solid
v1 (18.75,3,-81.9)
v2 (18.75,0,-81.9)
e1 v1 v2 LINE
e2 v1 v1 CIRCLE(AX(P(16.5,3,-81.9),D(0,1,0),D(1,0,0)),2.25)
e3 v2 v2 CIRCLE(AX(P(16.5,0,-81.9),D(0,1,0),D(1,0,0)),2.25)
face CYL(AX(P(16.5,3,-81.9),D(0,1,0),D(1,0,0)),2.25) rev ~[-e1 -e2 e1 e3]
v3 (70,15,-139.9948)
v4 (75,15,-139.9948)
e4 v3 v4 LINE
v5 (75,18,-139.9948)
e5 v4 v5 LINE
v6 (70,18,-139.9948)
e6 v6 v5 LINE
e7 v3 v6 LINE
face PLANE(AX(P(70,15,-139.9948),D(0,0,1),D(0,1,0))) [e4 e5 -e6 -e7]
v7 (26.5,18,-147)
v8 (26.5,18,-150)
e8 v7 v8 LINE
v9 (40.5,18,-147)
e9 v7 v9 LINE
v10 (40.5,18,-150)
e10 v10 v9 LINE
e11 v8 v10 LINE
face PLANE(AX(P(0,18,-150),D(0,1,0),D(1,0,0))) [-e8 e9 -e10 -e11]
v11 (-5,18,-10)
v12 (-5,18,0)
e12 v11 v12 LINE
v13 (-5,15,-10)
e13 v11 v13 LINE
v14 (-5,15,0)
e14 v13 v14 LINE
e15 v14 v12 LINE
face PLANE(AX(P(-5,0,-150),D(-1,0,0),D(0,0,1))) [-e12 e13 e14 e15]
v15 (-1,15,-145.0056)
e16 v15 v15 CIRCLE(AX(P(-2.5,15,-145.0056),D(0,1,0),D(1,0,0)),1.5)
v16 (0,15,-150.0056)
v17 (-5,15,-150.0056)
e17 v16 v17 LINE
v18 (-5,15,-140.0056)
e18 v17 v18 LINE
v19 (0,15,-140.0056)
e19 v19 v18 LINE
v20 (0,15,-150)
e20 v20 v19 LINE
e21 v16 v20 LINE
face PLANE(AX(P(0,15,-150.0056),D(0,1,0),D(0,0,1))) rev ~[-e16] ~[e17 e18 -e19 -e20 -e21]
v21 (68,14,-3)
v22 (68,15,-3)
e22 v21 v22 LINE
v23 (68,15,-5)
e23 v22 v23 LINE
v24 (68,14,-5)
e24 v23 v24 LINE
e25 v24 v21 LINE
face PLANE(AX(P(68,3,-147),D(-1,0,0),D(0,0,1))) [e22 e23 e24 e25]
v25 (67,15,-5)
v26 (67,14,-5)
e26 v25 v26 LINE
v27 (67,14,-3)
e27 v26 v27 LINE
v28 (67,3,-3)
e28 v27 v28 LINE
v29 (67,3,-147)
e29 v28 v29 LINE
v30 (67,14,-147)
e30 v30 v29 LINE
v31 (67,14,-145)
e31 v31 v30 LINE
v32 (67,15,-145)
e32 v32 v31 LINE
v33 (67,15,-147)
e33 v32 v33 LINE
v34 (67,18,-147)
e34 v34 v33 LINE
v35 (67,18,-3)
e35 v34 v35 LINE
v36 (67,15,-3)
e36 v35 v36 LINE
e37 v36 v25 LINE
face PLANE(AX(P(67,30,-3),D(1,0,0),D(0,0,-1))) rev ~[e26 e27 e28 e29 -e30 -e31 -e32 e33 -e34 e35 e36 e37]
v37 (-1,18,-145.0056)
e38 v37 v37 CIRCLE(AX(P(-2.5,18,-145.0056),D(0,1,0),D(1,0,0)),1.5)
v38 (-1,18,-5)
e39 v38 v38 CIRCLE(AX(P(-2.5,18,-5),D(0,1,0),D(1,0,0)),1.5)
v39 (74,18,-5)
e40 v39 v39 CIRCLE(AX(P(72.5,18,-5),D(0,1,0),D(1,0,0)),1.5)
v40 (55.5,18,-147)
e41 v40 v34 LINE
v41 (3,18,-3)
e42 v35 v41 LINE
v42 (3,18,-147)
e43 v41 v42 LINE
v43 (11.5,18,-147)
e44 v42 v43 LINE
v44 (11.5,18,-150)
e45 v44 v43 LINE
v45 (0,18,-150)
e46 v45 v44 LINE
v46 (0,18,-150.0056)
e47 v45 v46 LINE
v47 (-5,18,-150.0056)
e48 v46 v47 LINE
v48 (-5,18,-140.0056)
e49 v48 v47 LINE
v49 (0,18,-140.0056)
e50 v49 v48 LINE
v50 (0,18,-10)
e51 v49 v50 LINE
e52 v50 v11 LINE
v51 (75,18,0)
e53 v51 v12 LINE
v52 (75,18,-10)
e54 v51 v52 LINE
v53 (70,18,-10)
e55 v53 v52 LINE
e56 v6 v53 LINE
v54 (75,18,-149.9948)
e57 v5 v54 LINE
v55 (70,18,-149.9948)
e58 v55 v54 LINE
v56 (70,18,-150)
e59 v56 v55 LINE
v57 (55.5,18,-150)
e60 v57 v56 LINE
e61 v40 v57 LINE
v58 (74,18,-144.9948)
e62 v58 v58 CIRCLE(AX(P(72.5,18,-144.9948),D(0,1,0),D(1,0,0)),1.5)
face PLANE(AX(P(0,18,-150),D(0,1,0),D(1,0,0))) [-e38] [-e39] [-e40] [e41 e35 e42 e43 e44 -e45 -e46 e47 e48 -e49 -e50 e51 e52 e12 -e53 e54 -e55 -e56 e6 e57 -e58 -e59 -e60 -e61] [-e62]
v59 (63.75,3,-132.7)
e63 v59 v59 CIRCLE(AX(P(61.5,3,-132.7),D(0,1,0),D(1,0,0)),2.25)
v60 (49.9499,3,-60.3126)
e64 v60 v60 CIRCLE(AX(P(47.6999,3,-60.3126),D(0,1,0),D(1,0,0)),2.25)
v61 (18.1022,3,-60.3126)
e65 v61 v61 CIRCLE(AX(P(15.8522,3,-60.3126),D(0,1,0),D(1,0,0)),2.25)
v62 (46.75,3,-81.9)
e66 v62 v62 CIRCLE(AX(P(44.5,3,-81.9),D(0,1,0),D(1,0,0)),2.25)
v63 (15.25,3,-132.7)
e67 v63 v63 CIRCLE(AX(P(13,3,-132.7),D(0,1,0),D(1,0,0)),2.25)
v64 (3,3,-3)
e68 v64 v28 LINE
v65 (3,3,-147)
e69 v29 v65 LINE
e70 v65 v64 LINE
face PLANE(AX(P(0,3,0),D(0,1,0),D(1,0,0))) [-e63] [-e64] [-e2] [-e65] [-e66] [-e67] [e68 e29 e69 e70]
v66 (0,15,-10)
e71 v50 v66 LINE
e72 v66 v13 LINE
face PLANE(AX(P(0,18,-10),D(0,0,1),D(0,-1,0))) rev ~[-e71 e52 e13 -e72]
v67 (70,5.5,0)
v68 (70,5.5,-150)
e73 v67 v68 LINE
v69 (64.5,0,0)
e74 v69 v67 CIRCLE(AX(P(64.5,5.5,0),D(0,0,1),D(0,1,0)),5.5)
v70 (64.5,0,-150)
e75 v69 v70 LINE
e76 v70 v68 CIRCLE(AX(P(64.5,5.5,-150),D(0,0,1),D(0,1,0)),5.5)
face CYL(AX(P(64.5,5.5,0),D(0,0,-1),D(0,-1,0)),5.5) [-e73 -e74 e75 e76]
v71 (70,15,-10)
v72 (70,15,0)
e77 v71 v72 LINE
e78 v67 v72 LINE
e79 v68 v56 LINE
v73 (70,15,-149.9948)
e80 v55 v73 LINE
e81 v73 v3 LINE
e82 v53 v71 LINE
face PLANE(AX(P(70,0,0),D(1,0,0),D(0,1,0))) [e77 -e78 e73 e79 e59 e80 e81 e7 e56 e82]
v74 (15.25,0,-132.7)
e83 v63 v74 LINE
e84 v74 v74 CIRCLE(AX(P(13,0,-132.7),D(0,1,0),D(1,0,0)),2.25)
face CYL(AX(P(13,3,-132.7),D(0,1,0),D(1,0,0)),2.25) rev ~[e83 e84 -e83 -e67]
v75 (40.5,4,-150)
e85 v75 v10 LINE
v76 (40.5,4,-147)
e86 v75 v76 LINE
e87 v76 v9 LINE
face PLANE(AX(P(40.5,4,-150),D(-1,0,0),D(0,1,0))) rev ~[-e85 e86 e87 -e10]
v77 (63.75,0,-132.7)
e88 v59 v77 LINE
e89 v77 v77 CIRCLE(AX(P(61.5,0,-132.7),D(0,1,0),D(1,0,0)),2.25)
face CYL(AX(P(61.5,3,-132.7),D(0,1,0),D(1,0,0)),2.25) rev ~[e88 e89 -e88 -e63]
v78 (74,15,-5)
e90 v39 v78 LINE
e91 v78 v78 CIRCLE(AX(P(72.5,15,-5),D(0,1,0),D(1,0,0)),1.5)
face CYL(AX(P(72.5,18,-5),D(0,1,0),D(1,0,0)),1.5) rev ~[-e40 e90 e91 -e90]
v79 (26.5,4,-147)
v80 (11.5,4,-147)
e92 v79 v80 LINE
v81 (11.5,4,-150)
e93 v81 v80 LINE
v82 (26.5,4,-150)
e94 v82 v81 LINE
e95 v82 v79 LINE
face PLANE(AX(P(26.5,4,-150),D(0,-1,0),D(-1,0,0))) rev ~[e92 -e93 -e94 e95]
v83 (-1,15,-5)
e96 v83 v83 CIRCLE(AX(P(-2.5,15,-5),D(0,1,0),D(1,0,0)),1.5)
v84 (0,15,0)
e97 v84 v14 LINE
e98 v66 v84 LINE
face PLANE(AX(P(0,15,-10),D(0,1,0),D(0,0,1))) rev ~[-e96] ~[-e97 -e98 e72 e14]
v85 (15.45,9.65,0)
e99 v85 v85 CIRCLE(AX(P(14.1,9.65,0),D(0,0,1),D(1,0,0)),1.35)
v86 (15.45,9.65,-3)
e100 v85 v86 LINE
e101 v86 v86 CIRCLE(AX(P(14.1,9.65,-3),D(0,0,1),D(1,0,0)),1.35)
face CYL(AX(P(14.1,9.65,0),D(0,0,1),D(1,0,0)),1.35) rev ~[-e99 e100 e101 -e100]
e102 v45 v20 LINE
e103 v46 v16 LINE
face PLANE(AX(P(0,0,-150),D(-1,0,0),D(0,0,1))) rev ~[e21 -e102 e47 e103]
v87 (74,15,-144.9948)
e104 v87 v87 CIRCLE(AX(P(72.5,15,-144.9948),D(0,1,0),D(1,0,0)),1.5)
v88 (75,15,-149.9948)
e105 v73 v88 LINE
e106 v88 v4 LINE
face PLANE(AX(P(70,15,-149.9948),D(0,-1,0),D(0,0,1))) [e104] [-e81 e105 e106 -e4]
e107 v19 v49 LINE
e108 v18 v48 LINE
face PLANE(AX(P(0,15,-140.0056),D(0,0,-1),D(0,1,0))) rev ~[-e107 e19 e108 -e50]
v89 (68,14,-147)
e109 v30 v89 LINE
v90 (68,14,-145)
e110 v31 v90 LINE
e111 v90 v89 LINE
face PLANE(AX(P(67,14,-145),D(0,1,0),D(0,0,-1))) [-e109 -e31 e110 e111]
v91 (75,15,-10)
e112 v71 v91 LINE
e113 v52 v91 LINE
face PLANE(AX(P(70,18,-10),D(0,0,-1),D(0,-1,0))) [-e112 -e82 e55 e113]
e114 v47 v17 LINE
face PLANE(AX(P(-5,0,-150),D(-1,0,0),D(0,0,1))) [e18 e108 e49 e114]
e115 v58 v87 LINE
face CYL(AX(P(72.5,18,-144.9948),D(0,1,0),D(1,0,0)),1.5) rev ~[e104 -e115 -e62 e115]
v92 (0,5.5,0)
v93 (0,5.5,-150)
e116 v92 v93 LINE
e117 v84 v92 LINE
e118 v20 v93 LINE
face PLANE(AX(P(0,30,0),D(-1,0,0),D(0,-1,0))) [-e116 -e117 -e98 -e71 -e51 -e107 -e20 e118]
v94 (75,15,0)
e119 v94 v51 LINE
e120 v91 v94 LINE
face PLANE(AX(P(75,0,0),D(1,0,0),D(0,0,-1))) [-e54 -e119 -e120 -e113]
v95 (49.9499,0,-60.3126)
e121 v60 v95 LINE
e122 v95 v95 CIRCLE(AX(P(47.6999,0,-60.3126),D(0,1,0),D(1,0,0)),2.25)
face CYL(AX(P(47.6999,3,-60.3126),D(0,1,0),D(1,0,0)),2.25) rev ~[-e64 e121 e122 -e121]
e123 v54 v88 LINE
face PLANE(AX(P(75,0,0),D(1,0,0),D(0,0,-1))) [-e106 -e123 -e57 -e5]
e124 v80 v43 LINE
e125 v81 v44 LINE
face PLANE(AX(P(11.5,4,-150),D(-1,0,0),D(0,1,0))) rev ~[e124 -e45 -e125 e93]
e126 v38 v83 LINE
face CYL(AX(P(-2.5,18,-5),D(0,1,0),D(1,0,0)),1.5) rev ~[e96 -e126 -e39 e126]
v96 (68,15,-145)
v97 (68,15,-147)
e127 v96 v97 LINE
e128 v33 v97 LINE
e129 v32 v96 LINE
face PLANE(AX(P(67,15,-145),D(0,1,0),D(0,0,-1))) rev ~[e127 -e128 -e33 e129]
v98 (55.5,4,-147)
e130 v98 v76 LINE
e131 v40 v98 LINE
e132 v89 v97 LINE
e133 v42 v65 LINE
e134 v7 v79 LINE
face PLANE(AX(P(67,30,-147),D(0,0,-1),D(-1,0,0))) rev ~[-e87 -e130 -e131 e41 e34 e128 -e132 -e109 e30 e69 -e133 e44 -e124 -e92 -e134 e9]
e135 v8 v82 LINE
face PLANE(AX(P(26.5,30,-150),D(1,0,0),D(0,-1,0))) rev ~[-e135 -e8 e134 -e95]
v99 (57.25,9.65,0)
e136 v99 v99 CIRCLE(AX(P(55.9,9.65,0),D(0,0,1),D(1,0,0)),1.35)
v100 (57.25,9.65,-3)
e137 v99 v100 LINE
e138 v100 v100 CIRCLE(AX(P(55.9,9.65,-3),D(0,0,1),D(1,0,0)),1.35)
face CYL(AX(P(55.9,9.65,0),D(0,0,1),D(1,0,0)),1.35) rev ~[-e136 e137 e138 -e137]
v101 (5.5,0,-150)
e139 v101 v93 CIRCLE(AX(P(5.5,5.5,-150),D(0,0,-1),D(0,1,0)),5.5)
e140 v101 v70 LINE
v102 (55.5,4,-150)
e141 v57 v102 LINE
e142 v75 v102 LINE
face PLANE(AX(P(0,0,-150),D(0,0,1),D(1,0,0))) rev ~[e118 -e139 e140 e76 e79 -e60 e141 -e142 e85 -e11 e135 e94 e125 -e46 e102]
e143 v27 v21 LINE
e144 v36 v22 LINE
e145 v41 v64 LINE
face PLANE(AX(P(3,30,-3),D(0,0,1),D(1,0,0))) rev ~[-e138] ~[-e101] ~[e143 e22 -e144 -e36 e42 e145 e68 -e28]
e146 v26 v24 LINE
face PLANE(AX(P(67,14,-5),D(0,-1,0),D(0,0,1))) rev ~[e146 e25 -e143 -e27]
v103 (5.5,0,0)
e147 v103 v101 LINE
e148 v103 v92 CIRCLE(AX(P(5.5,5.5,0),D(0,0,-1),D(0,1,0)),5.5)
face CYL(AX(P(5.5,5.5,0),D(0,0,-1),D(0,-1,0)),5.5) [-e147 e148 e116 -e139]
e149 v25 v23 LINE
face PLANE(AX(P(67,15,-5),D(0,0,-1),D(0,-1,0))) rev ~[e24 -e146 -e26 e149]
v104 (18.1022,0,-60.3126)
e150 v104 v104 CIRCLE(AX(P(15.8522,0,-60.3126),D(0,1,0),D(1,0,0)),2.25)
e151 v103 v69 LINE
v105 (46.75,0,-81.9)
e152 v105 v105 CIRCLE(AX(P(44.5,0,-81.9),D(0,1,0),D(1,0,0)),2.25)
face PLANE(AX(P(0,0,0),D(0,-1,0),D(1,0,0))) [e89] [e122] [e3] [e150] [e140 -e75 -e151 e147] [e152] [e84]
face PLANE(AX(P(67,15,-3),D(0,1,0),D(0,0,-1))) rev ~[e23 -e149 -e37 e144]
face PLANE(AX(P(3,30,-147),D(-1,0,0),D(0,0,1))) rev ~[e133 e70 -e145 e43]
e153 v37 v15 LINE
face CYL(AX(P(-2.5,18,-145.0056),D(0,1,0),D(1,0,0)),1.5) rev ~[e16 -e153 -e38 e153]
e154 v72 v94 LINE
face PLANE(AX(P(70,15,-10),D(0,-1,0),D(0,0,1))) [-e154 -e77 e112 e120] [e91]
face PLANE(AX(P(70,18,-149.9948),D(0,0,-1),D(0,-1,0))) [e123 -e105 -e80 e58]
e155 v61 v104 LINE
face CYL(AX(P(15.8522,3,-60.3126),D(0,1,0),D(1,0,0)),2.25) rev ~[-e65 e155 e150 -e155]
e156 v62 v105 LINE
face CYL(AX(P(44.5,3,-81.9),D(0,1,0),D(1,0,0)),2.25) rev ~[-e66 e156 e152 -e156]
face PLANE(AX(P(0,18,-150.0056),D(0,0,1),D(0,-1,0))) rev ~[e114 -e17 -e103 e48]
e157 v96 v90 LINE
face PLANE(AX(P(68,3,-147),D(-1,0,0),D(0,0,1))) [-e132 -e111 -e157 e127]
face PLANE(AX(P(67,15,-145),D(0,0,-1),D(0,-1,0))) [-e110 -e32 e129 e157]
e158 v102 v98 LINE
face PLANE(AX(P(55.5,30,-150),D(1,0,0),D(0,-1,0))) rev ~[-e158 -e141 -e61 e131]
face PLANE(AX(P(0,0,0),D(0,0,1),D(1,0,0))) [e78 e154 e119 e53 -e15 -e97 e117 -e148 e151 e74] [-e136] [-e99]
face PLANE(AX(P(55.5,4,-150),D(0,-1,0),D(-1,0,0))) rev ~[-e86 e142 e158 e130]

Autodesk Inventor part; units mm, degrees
ref_plane "YZ Plane" through (0, 0, 0) normal (1, 0, 0) x (0, 1, 0)
ref_plane "XZ Plane" through (0, 0, 0) normal (0, 1, 0) x (-1, 0, 0)
ref_plane "XY Plane" through (0, 0, 0) normal (0, 0, 1) x (1, 0, 0)
sketch "Sketch7" plane through (0, 0, 0) normal (0, 0, 1) x (1, 0, 0)
  line L0 (0, 0) -> (70, 0)
  line L1 (70, 0) -> (70, 30)
  line L2 (70, 30) -> (0, 30)
  line L3 (0, 30) -> (0, 0)
  dimension "d25" = 70
  dimension "d26" = 30
extrude "Extrusion5" add sketch "Sketch7" against normal blind 150
sketch "Sketch8" plane through (0, 30, 0) normal (0, 1, 0) x (1, 0, 0)
  line L0 (0, 0) -> (3, 0)
  line L1 (3, 0) -> (3, 3)
  line L2 (3, 3) -> (0, 3)
  line L3 (0, 3) -> (0, 0)
  line L4 (70, 150) -> (67, 150)
  line L5 (67, 150) -> (67, 147)
  line L6 (67, 147) -> (70, 147)
  line L7 (70, 147) -> (70, 150)
  line L8 (3, 3) -> (67, 3)
  line L9 (67, 3) -> (67, 147)
  line L10 (67, 147) -> (3, 147)
  line L11 (3, 147) -> (3, 3)
  dimension "d29" = 3
  dimension "d30" = 3
  dimension "d31" = 3
  dimension "d32" = 3
extrude "Extrusion6" cut sketch "Sketch8" against normal blind 27 contours L11 L10 L9 L8
sketch "Sketch10" plane through (0, 0, -150) normal (0, 0, -1) x (-1, 0, 0)
  line L0 (-70, 30) -> (-70, 0) projected
  line L1 (-70, 0) -> (-61.5, 0)
  line L2 (-70, 4) -> (-70, 0)
  line L3 (0, 0) -> (0, 30) projected
  line L4 (0, 0) -> (-8.5, 0)
  line L5 (0, 4) -> (0, 0)
  line L6 (-54.5, 4) -> (-41.5, 4)
  line L7 (-61.5, 0) -> (-51.709, 0)
  line L8 (-8.5, 0) -> (-41.5, 0)
  line L9 (-26.0357, 0) -> (-23.5, 0)
  line L10 (-40.5, 4) -> (-40.5, 30)
  line L11 (-40.5, 30) -> (-55.5, 30)
  line L12 (-55.5, 30) -> (-55.5, 4)
  line L13 (-70, 0) -> (0, 0) projected
  line L14 (-55.5, 0) -> (-40.5, 0)
  line L15 (-55.5, 4) -> (-40.5, 4)
  line L16 (-11.5, 4) -> (-11.5, 30)
  line L17 (-11.5, 30) -> (-26.5, 30)
  line L18 (-26.5, 30) -> (-26.5, 4)
  line L19 (-26.5, 4) -> (-11.5, 4)
  point P0 (-48, 10)
  dimension "d188" = 15
  dimension "d189" = 15
sketch "Sketch15" plane through (0, 0, -150) normal (0, 0, -1) x (-1, 0, 0)
  line L0 (-70, 30) -> (-70, 0) projected
  line L1 (0, 30) -> (0, 0) projected
  line L2 (-70, 30) -> (0, 30)
  line L3 (0, 30) -> (0, 18)
  line L4 (0, 18) -> (-70, 18)
  line L5 (-70, 18) -> (-70, 30)
  dimension "d100" = 12
extrude "Extrusion10" cut sketch "Sketch15" against normal blind 10000
sketch "Sketch20" plane through (67, 3, -147) normal (-1, 0, 0) x (0, 0, 1)
  line L0 (0, 15) -> (144, 15)
  line L1 (144, 15) -> (144, 12)
  line L2 (144, 12) -> (0, 12)
  line L3 (0, 12) -> (0, 15)
  line L4 (0, 12) -> (2, 12)
  line L5 (2, 12) -> (2, 11)
  line L6 (2, 11) -> (0, 11)
  line L7 (0, 11) -> (0, 12)
  line L8 (144, 12) -> (142, 12)
  line L9 (142, 12) -> (142, 11)
  line L10 (142, 11) -> (144, 11)
  line L11 (144, 11) -> (144, 12)
  point P0 (147, -3)
  point P1 (2, 12)
  dimension "d132" = 144
  dimension "d133" = 3
  dimension "d134" = 2
  dimension "d135" = 1
  dimension "d136" = 2
  dimension "d137" = 1
extrude "Extrusion17" cut sketch "Sketch20" against normal blind 1 contours L2 L5 L6 L7 | L11 L10 L9 L2
sketch "Sketch21" plane through (70, 0, 0) normal (1, 0, 0) x (0, 0, -1)
  line L0 (0, 0) -> (0, 18) projected
  line L1 (0, 18) -> (10, 18)
  line L2 (10, 18) -> (10, 15)
  line L3 (10, 15) -> (0, 15)
  line L4 (0, 15) -> (0, 18)
  line L5 (139.9948, 18) -> (149.9948, 18)
  line L6 (149.9948, 18) -> (149.9948, 15)
  line L7 (149.9948, 15) -> (139.9948, 15)
  line L8 (139.9948, 15) -> (139.9948, 18)
  dimension "d144" = 10
  dimension "d145" = 3
  dimension "d146" = 10
  dimension "d147" = 3
extrude "Extrusion18" add sketch "Sketch21" along normal blind 5
sketch "Sketch23" plane through (0, 0, -150) normal (-1, 0, 0) x (0, 0, 1)
  line L0 (150, 18) -> (147, 18) projected
  line L1 (150, 18) -> (140, 18)
  line L2 (140, 18) -> (140, 15)
  line L3 (140, 15) -> (150, 15)
  line L4 (150, 15) -> (150, 18)
  line L5 (9.9944, 18) -> (-0.0056, 18)
  line L6 (-0.0056, 18) -> (-0.0056, 15)
  line L7 (-0.0056, 15) -> (9.9944, 15)
  line L8 (9.9944, 15) -> (9.9944, 18)
  point P0 (150, 0)
  point P1 (149.4, 18)
  point P2 (149.4, 18)
  dimension "d158" = 10
  dimension "d159" = 3
  dimension "d160" = 10
  dimension "d161" = 3
extrude "Extrusion20" add sketch "Sketch23" along normal blind 5
sketch "Sketch25" plane through (3, 18, -147) normal (0, 1, 0) x (1, 0, 0)
  line L0 (72, -147) -> (-8, -147) projected
  line L1 (-8, -147) -> (-5.5, -147)
  line L2 (-8, -142) -> (-8, -147)
  line L3 (53.15, -147) -> (72, -147) projected
  line L4 (72, -147) -> (69.5, -147)
  line L5 (72, -142) -> (72, -147)
  line L6 (72, 2.9948) -> (69.5, 2.9948)
  line L7 (72, -2.0052) -> (72, 2.9948)
  line L8 (-8, 3.0056) -> (-8, -6.9944) projected
  line L9 (-8, 3.0056) -> (-5.5, 3.0056)
  line L10 (-8, -1.9944) -> (-8, 3.0056)
  circle A0 centre (-5.5, -1.9944) radius 1.5
  circle A1 centre (69.5, -2.0052) radius 1.5
  circle A2 centre (69.5, -142) radius 1.5
  circle A3 centre (-5.5, -142) radius 1.5
  point P0 (-3, -147)
  point P1 (10.85, -147)
  dimension "d180" = 3
  dimension "d181" = 3
  dimension "d182" = 3
  dimension "d183" = 3
extrude "Extrusion22" cut sketch "Sketch25" against normal blind 10
extrude "Extrusion23" cut sketch "Sketch10" against normal blind 10
sketch "Sketch26" plane through (0, 3, 0) normal (0, 1, 0) x (1, 0, 0)
  line L0 (3, 147) -> (67, 147) projected
  line L1 (3, 147) -> (13, 147)
  line L2 (3, 132.7) -> (3, 147)
  line L3 (61.5, 121.8573) -> (13, 121.8573)
  line L4 (16.5, 91.8787) -> (44.5, 91.8787)
  circle A0 centre (16.5, 81.9) radius 2.25
  circle A1 centre (44.5, 81.9) radius 2.25
  circle A2 centre (61.5, 132.7) radius 2.25
  circle A3 centre (13, 132.7) radius 2.25
  point P0 (0, 0)
  dimension "d195" = 48.5
  dimension "d200" = 28
  dimension "d233" = 4.5
  dimension "d234" = 4.5
  dimension "d235" = 4.5
  dimension "d236" = 4.5
fillet "Face Fillet3" radius 5.5 1 edges at (70, 0, -75)
fillet "Face Fillet4" radius 5.5 1 edges at (0, 0, -75)
sketch "Sketch27" plane through (0, 0, 0) normal (0, 0, 1) x (1, 0, 0)
  line L0 (12.25, 28.2) -> (57.75, 28.2)
  line L1 (57.75, 28.2) -> (57.75, 7.8)
  line L2 (57.75, 7.8) -> (12.25, 7.8)
  line L3 (12.25, 7.8) -> (12.25, 28.2)
  line L4 (75, 18) -> (-5, 18) projected
  line L5 (57.75, 28.2) -> (12.25, 7.8) construction
  line L6 (12.25, 7.8) -> (12.75, 7.8)
  line L7 (12.25, 8.3) -> (12.25, 7.8)
  line L8 (57.75, 7.8) -> (57.25, 7.8)
  line L9 (57.75, 8.3) -> (57.75, 7.8)
  circle A0 centre (14.1, 9.65) radius 1.35
  line L10 (15.95, 7.8) -> (15.45, 7.8)
  circle A1 centre (55.9, 9.65) radius 1.35
  line L11 (57.75, 8.3) -> (57.75, 7.8)
  point P0 (0, 0)
  point P1 (35, 18)
  dimension "d210" = 45.5
  dimension "d211" = 20.4
  dimension "d218" = 2.7
  dimension "d219" = 0.5
  dimension "d221" = 2.7
  dimension "d223" = 0.5
extrude "Extrusion27" cut sketch "Sketch27" against normal blind 10 contours A0 | A1
sketch "Sketch28" plane through (0, 3, 0) normal (0, 1, 0) x (1, 0, 0)
  line L0 (51.8999, 76.8126) -> (11.6522, 76.8126)
  line L1 (11.6522, 76.8126) -> (11.6522, 60.3126)
  line L2 (51.8999, 60.3126) -> (51.8999, 76.8126)
  line L3 (51.8999, 58.2305) -> (51.8999, 60.3126)
  circle A0 centre (47.6999, 60.3126) radius 2.25
  line L4 (11.6522, 57.5365) -> (11.6522, 60.3126)
  circle A1 centre (15.8522, 60.3126) radius 2.25
  point P0 (0, 0)
  dimension "d226" = 16.5
  dimension "d228" = 4.5
  dimension "d230" = 4.5
extrude "Extrusion28" cut sketch "Sketch28" against normal blind 10
extrude "Extrusion29" cut sketch "Sketch26" against normal blind 10
properties part number "BOT_HOLDER_ENGR-2200_3DPrint"
